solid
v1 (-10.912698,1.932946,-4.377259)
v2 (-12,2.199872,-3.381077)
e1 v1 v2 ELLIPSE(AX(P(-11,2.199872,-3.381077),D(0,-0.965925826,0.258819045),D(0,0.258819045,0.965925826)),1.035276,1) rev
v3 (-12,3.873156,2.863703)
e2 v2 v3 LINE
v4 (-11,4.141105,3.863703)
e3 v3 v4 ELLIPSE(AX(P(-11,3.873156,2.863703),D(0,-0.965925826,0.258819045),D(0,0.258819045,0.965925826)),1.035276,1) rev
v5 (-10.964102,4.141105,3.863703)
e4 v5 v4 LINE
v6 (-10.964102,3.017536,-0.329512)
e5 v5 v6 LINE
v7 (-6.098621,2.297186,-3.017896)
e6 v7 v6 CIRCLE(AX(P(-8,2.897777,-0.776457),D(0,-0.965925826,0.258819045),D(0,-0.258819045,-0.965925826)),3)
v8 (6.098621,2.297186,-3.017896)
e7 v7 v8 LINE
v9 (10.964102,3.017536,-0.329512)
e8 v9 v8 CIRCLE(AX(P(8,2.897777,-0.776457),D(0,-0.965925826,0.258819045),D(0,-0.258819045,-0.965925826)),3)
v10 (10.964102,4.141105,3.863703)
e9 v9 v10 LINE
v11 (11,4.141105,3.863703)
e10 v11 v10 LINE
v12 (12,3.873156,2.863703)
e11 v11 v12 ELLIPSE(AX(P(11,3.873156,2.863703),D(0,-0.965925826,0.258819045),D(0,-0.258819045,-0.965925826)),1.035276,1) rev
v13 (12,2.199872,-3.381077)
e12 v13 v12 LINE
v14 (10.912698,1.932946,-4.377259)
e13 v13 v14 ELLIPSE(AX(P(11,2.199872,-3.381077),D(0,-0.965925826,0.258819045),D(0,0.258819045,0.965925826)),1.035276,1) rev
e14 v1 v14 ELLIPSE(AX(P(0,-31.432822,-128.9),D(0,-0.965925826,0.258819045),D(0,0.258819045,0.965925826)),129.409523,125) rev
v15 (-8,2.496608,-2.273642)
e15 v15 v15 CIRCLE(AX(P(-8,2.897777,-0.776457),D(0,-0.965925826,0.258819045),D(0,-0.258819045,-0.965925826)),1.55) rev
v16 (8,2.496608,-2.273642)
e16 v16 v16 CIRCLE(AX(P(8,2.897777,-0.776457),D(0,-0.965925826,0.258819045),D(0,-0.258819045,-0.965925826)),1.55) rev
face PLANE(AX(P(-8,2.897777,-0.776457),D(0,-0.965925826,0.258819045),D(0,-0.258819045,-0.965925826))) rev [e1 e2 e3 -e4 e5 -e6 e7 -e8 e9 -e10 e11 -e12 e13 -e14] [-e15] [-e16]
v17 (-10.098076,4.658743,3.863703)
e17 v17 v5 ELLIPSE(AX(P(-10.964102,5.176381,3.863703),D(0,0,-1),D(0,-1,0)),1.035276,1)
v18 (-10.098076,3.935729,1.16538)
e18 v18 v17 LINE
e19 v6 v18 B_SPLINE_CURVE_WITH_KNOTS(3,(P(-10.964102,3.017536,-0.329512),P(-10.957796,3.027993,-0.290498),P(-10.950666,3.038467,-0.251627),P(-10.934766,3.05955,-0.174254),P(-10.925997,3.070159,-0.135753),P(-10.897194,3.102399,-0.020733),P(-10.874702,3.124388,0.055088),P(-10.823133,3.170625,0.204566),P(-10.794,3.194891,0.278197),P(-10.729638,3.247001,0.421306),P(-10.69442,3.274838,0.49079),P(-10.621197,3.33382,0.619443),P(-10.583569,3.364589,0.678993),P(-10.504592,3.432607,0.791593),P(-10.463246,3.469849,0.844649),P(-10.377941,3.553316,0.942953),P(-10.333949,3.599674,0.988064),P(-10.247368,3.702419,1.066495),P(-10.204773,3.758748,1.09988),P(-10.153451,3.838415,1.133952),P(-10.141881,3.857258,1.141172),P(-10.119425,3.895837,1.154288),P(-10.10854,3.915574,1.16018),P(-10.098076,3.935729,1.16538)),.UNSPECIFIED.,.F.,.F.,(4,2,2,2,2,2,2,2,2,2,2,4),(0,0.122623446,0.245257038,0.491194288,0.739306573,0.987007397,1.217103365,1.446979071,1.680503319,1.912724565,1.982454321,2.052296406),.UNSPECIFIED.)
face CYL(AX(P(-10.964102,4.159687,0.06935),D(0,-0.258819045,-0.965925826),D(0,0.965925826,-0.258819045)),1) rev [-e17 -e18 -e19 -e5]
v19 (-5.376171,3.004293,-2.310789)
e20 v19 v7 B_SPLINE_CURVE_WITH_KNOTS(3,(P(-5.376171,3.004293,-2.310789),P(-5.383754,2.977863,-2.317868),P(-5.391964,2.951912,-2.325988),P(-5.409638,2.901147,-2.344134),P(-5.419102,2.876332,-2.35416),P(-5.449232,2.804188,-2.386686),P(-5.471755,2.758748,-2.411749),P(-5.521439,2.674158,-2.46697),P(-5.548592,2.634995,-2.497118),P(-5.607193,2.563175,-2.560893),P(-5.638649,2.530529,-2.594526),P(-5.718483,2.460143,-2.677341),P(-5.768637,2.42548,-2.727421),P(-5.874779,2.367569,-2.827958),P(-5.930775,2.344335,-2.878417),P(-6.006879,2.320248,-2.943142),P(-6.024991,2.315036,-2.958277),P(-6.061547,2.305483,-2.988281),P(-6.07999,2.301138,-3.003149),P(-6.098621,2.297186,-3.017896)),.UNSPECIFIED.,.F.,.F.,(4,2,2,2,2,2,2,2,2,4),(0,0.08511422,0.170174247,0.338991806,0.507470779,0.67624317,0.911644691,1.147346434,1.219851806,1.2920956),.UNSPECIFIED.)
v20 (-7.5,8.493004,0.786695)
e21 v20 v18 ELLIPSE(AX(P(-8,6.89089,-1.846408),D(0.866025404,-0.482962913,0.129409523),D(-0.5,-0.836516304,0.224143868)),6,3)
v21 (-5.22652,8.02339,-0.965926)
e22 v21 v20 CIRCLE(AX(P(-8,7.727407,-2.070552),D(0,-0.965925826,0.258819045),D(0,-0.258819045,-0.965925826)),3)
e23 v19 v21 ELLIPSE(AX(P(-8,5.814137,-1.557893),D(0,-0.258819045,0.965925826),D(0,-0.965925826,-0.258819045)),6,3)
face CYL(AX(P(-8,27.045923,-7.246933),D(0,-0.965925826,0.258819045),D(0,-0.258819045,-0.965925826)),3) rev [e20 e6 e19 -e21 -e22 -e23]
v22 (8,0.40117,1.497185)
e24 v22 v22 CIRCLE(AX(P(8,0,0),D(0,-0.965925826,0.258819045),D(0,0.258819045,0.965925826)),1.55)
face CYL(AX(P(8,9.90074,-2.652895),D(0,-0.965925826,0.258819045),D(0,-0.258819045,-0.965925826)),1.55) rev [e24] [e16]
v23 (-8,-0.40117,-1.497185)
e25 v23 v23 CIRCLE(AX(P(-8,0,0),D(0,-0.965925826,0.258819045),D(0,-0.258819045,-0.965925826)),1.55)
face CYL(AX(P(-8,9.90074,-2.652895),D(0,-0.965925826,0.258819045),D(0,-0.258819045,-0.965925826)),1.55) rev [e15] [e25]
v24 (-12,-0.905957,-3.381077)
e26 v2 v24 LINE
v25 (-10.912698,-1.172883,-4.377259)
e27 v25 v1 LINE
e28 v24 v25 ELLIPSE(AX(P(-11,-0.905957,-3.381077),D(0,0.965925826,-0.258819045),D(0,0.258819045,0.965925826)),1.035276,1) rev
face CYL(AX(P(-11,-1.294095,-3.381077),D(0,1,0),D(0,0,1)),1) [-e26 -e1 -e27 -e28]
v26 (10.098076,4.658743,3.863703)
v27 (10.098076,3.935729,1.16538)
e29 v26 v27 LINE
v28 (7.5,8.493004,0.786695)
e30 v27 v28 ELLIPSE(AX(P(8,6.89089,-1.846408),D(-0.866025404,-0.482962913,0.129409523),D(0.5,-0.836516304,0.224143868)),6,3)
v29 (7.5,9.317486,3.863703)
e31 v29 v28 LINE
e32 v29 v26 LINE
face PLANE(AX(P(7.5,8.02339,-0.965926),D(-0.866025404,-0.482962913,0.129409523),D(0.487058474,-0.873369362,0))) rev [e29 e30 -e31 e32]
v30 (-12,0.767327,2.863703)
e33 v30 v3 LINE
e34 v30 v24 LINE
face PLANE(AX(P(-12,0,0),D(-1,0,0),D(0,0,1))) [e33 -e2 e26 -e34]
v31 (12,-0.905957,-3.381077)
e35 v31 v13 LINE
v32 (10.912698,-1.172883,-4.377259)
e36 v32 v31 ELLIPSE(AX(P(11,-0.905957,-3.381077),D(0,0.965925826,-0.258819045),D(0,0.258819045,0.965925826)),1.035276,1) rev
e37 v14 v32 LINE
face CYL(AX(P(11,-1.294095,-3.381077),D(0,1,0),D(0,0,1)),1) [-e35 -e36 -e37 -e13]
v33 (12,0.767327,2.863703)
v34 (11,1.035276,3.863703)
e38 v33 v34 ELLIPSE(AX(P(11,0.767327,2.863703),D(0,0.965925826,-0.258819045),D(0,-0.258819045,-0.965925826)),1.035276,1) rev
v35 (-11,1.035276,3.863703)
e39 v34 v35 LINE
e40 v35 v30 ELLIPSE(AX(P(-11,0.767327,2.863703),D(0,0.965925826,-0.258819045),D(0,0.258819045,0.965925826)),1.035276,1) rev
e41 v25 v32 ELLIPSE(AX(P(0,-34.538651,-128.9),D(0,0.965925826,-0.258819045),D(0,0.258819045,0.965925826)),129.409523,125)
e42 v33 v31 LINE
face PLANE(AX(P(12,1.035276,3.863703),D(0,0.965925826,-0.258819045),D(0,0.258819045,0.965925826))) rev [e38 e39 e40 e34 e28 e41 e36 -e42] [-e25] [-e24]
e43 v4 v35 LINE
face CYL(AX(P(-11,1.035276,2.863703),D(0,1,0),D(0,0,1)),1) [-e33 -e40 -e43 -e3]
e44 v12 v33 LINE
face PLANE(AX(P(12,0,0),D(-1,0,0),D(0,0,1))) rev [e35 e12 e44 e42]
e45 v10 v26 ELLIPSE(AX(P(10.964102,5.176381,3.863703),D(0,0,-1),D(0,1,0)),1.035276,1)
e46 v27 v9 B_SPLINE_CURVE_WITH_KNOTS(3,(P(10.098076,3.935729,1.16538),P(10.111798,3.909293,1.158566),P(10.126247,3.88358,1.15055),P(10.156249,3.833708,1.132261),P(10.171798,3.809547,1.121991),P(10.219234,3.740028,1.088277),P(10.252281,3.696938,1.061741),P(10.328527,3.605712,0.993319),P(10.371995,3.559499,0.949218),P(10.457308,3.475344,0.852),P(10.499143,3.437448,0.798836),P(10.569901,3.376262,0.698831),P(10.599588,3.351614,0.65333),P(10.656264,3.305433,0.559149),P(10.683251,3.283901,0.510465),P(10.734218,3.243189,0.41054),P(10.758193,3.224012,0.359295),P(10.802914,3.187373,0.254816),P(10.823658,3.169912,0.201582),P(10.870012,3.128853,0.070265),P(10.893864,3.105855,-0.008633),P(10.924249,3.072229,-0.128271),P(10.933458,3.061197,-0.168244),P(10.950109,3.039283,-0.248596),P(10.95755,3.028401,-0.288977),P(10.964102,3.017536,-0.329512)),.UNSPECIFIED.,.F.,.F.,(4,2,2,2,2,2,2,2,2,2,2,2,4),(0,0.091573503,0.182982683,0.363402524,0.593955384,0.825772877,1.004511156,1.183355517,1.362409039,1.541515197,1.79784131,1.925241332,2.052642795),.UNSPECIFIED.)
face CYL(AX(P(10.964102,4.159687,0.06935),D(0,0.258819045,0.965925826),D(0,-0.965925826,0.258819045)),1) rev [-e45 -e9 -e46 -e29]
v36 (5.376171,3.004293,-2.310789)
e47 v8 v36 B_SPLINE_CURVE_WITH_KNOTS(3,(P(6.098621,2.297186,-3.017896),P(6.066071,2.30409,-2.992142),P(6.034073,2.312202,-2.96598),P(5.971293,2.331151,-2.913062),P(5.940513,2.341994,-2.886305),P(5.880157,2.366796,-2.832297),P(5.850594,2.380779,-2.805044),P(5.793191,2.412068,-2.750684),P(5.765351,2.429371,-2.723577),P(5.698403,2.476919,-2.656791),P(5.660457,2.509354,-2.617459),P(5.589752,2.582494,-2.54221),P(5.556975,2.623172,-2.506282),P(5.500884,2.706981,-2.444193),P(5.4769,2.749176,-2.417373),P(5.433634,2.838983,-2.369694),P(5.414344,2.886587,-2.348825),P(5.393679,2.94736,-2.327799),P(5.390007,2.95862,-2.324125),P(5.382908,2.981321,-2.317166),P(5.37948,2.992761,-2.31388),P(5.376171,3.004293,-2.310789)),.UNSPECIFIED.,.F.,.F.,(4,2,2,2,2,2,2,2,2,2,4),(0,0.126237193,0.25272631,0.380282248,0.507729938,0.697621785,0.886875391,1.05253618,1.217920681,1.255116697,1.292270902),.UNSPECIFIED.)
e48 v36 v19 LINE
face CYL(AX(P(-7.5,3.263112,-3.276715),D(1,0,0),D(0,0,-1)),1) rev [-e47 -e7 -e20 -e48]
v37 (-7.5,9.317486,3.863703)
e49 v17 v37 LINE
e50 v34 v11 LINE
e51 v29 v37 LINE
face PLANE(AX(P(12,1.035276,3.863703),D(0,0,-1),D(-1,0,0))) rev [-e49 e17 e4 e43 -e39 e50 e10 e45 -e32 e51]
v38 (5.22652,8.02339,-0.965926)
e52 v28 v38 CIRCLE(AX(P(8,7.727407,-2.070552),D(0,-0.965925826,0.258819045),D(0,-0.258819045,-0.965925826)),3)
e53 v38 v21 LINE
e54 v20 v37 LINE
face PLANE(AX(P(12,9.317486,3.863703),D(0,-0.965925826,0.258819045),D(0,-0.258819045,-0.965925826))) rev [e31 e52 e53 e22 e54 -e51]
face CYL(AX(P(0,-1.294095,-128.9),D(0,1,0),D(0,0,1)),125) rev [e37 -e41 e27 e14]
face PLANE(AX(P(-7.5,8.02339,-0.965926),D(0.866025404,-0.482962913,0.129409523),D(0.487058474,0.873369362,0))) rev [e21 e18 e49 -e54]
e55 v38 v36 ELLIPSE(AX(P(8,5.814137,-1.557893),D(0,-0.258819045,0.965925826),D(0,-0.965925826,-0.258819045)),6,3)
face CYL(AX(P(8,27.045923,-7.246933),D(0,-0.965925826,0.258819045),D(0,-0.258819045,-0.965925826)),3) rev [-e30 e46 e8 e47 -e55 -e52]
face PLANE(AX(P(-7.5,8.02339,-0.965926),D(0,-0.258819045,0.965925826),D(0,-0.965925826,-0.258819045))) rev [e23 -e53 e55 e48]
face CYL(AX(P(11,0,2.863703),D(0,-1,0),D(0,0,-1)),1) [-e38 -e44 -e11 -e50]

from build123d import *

# Parameters (mm, degrees)
BOSS_EXTRU_1_DEPTH            = 12
ESQUISSE2_R                   = 1.55
ENL_V_MAT_EXTRU_1_DEPTH       = 16.94179588
ENL_V_START                   = -3
ESQUISSE3_R                   = 3
ENL_V_MAT_EXTRU_2_DEPTH       = 25
ENL_V_MAT_EXTRU_3_DEPTH       = 16.94179588
ENL_V_MAT_EXTRU_3_DEPTH_BACK  = 16.94179588
ESQUISSE4_R                   = 125
ENL_V_START_2                 = -12
ENL_V_MAT_EXTRU_4_DEPTH       = 1.613248654
ENL_V_START_3                 = 10.386751346
ENL_V_MAT_EXTRU_4_2_DEPTH     = 1.613248654
ENL_V_START_4                 = -4.63527657
ENL_V_MAT_EXTRU_4_3_OUTLINE_W = 24
ENL_V_MAT_EXTRU_4_3_OUTLINE_H = 5
ENL_V_MAT_EXTRU_4_3_DEPTH     = 2.892118763
ENL_V_START_5                 = -1.893983464
ENL_V_MAT_EXTRU_4_4_DEPTH     = 8.893983464
ENL_V_START_6                 = -7.5
ENL_V_MAT_EXTRU_4_5_DEPTH     = 15
CONG_1_R                      = 1


with BuildPart() as part:
    # Esquisse1 → Boss.-Extru.1 (new, symmetric)
    with BuildSketch(Plane(origin=(0, 0, 0), x_dir=(0, 0, -1), z_dir=(1, 0, 0))):
        Polygon((-3.863703305, 1.03527618), (4.829629131, -1.294095226), (4.829629131, 6.988114218), (-3.863703305, 9.317485624), align=None)
    extrude(amount=BOSS_EXTRU_1_DEPTH, both=True)

    # Esquisse2 → Enlèv. mat.-Extru.1 (cut, through all)
    with BuildSketch(Plane(origin=(0, 0, 0), x_dir=(1, 0, 0), z_dir=(0, -0.9659258262890672, 0.2588190451025247))):
        with Locations(Location((-8, 0, 0), (0, 0, 270))):
            Circle(ESQUISSE2_R)
        with Locations(Location((8, 0, 0), (0, 0, 270))):
            Circle(ESQUISSE2_R)
    extrude(amount=-ENL_V_MAT_EXTRU_1_DEPTH, mode=Mode.SUBTRACT)

    # Esquisse3 → Enlèv. mat.-Extru.2 (cut)
    with BuildSketch(Plane(origin=(0, 0, 0), x_dir=(1, 0, 0), z_dir=(0, -0.9659258262890672, 0.2588190451025247)).offset(ENL_V_START)):
        with Locations(Location((-8, 0, 0), (0, 0, 270))):
            Circle(ESQUISSE3_R)
        with Locations(Location((8, 0, 0), (0, 0, 270))):
            Circle(ESQUISSE3_R)
    extrude(amount=-ENL_V_MAT_EXTRU_2_DEPTH, mode=Mode.SUBTRACT)

    # Esquisse4 → Enlèv. mat.-Extru.3 (cut, two sides: drawn at the far end of the back side and taken through both)
    with BuildSketch(Plane(origin=(0, 0, 0), x_dir=(1, 0, 0), z_dir=(0, 1, 0)).offset(-ENL_V_MAT_EXTRU_3_DEPTH_BACK)):
        with Locations((0, 128.9)):
            Circle(ESQUISSE4_R)
    extrude(amount=ENL_V_MAT_EXTRU_3_DEPTH + ENL_V_MAT_EXTRU_3_DEPTH_BACK, mode=Mode.SUBTRACT)

    # Enlèv. mat.-Extru.4: read off the stored shape, not the designer's step
    # Enlèv. mat.-Extru.4 outline → Enlèv. mat.-Extru.4 (cut)
    with BuildSketch(Plane.YZ.offset(ENL_V_START_2)):
        Polygon((9.317485624, 3.863703305), (4.141104722, 3.863703305), (2.44661504, -2.46021828), (8.023390398, -0.965925826), align=None)
    extrude(amount=ENL_V_MAT_EXTRU_4_DEPTH, mode=Mode.SUBTRACT)

    # Enl_v. mat.-Extru.4 2 outline → Enl_v. mat.-Extru.4 2 (cut)
    with BuildSketch(Plane.YZ.offset(ENL_V_START_3)):
        Polygon((9.317485624, 3.863703305), (4.141104722, 3.863703305), (2.44661504, -2.46021828), (8.023390398, -0.965925826), align=None)
    extrude(amount=ENL_V_MAT_EXTRU_4_2_DEPTH, mode=Mode.SUBTRACT)

    # Enl_v. mat.-Extru.4 3 outline → Enl_v. mat.-Extru.4 3 (cut)
    with BuildSketch(Plane(origin=(0, 0, 0), x_dir=(1, 0, 0), z_dir=(0, 0.25881904510252507, 0.9659258262890671)).offset(ENL_V_START_4)):
        with Locations((0, 5.5)):
            Rectangle(ENL_V_MAT_EXTRU_4_3_OUTLINE_W, ENL_V_MAT_EXTRU_4_3_OUTLINE_H)
    extrude(amount=ENL_V_MAT_EXTRU_4_3_DEPTH, mode=Mode.SUBTRACT)

    # Enl_v. mat.-Extru.4 4 outline → Enl_v. mat.-Extru.4 4 (cut)
    with BuildSketch(Plane(origin=(0, 0, 0), x_dir=(1, 0, 0), z_dir=(0, 0.25881904510252507, 0.9659258262890671)).offset(ENL_V_START_5)):
        Polygon((-12, 8), (-12, 3), (-10.386751346, 3), (-7.5, 8), align=None)
        Polygon((12, 8), (7.5, 8), (10.386751346, 3), (12, 3), align=None)
    extrude(amount=ENL_V_MAT_EXTRU_4_4_DEPTH, mode=Mode.SUBTRACT)

    # Enl_v. mat.-Extru.4 5 outline → Enl_v. mat.-Extru.4 5 (cut)
    with BuildSketch(Plane.YZ.offset(ENL_V_START_6)):
        Polygon((7.276244171, -3.754313506), (8.023390398, -0.965925826), (2.44661504, -2.46021828), align=None)
    extrude(amount=ENL_V_MAT_EXTRU_4_5_DEPTH, mode=Mode.SUBTRACT)

    # Congé1
    # the kernel refuses this fillet: 1 mm, written as the material it adds along each edge
    with BuildSketch(Plane(origin=(-10.386751346, 4.514677836, 5.257897145), x_dir=(-1, 0, 0), z_dir=(0, -0.2588190451454881, -0.9659258262775553))) as cong_1_piece_1_section:
        with BuildLine():
            CenterArc((CONG_1_R * 0.577350268999, CONG_1_R), CONG_1_R, 210, 60)
            Line((-CONG_1_R * 0.288675134782, CONG_1_R * 0.499999999993), (0, 0))
            Line((0, 0), (CONG_1_R * 0.577350268999, 0))
        make_face()
    cong_1_piece_1 = extrude(amount=5.873068178, mode=Mode.PRIVATE)
    cong_1_piece_1 = split(cong_1_piece_1, bisect_by=Plane(origin=(-10.386751346, 4.514677836, 3.863703305), z_dir=(0, 0, -1)), keep=Keep.TOP, mode=Mode.PRIVATE)
    cong_1_piece_1 = cong_1_piece_1 - Plane(origin=(-8, 2.897777479, -0.776457135), x_dir=(0, -0.25881904510252474, -0.9659258262890673), z_dir=(0, -0.9659258262890673, 0.25881904510252474)) * Cylinder(3, 15, mode=Mode.PRIVATE)
    add(cong_1_piece_1)
    with BuildSketch(Plane(origin=(-7.00177766, 2.44661504, -2.46021828), x_dir=(0, -0.2588190451025249, -0.9659258262890672), z_dir=(1, 0, 0))) as cong_1_piece_2_section:
        with BuildLine():
            CenterArc((CONG_1_R * 0.577350268769, CONG_1_R), CONG_1_R, 210.000000004, 59.999999996)
            Line((-CONG_1_R * 0.288675134977, CONG_1_R * 0.499999999934), (0, 0))
            Line((0, 0), (CONG_1_R * 0.577350268769, 0))
        make_face()
    cong_1_piece_2 = extrude(amount=14.003555319, mode=Mode.PRIVATE)
    cong_1_piece_2 = cong_1_piece_2 - Plane(origin=(-8, 2.897777479, -0.776457135), x_dir=(0, -0.25881904510252474, -0.9659258262890673), z_dir=(0, -0.9659258262890673, 0.25881904510252474)) * Cylinder(3, 31, mode=Mode.PRIVATE)
    cong_1_piece_2 = cong_1_piece_2 - Plane(origin=(8, 2.897777479, -0.776457135), x_dir=(0, -0.25881904510252474, -0.9659258262890673), z_dir=(0, -0.9659258262890673, 0.25881904510252474)) * Cylinder(3, 31, mode=Mode.PRIVATE)
    add(cong_1_piece_2)
    with BuildSketch(Plane(origin=(10.386751346, 4.514677836, 5.257897145), x_dir=(-0.5000000002478059, 0.8365163035896415, -0.22414386804219472), z_dir=(0, -0.2588190451454881, -0.9659258262775553))) as cong_1_piece_3_section:
        with BuildLine():
            CenterArc((CONG_1_R * 0.577350268999, CONG_1_R), CONG_1_R, 210.000000016, 60)
            Line((-CONG_1_R * 0.288675134643, CONG_1_R * 0.499999999752), (0, 0))
            Line((0, 0), (CONG_1_R * 0.577350269277, 0))
        make_face()
    cong_1_piece_3 = extrude(amount=5.873068178, mode=Mode.PRIVATE)
    cong_1_piece_3 = split(cong_1_piece_3, bisect_by=Plane(origin=(10.386751346, 4.514677836, 3.863703305), z_dir=(0, 0, -1)), keep=Keep.TOP, mode=Mode.PRIVATE)
    cong_1_piece_3 = cong_1_piece_3 - Plane(origin=(8, 2.897777479, -0.776457135), x_dir=(0, -0.25881904510252474, -0.9659258262890673), z_dir=(0, -0.9659258262890673, 0.25881904510252474)) * Cylinder(3, 15, mode=Mode.PRIVATE)
    add(cong_1_piece_3)
    # the kernel refuses this fillet: 1 mm, written as the material it takes off along each edge
    with BuildSketch(Plane(origin=(12, 6.641104722, 3.863703305), x_dir=(0, 0, -1), z_dir=(0, -1, 0))) as cong_1_2_piece_1:
        with BuildLine():
            CenterArc((CONG_1_R, -CONG_1_R), CONG_1_R, 90, 90)
            Line((0, -CONG_1_R), (0, 0))
            Line((0, 0), (CONG_1_R, 0))
        make_face()
    extrude(amount=8.105828542, mode=Mode.SUBTRACT)
    with BuildSketch(Plane(origin=(-12, 6.641104722, 3.863703305), x_dir=(0, 0, -1), z_dir=(0, -1, 0))) as cong_1_2_piece_2:
        with BuildLine():
            CenterArc((CONG_1_R, CONG_1_R), CONG_1_R, 180, 90)
            Line((0, CONG_1_R), (0, 0))
            Line((0, 0), (CONG_1_R, 0))
        make_face()
    extrude(amount=8.105828542, mode=Mode.SUBTRACT)
    with BuildSketch(Plane(origin=(-12, -3.940338157, -4.477333255), x_dir=(0, 0, 1), z_dir=(0, 1, 0))) as cong_1_2_piece_3:
        with BuildLine():
            CenterArc((1.096256131, 1), CONG_1_R, 174.991611749, 95.008388251)
            ThreePointArc((0.100074203, 1.087301587), (0.051224329, 0.543541522), (0, 0))
            Line((0, 0), (1.096256131, 0))
        make_face()
    extrude(amount=8.587109196, mode=Mode.SUBTRACT)
    with BuildSketch(Plane(origin=(12, -3.940338157, -4.477333255), x_dir=(-0.9957911285935623, 0, 0.09165166782093803), z_dir=(0, 1, 0))) as cong_1_2_piece_4:
        with BuildLine():
            CenterArc((1.096264831, 0.999990462), CONG_1_R, 174.741366539, 95.008388251)
            Line((0.100473703, 1.09164213), (0, 0))
            ThreePointArc((0, 0), (0.545948621, 0.001192245), (1.091897242, 0))
        make_face()
    extrude(amount=8.587109196, mode=Mode.SUBTRACT)


solid = part.part
